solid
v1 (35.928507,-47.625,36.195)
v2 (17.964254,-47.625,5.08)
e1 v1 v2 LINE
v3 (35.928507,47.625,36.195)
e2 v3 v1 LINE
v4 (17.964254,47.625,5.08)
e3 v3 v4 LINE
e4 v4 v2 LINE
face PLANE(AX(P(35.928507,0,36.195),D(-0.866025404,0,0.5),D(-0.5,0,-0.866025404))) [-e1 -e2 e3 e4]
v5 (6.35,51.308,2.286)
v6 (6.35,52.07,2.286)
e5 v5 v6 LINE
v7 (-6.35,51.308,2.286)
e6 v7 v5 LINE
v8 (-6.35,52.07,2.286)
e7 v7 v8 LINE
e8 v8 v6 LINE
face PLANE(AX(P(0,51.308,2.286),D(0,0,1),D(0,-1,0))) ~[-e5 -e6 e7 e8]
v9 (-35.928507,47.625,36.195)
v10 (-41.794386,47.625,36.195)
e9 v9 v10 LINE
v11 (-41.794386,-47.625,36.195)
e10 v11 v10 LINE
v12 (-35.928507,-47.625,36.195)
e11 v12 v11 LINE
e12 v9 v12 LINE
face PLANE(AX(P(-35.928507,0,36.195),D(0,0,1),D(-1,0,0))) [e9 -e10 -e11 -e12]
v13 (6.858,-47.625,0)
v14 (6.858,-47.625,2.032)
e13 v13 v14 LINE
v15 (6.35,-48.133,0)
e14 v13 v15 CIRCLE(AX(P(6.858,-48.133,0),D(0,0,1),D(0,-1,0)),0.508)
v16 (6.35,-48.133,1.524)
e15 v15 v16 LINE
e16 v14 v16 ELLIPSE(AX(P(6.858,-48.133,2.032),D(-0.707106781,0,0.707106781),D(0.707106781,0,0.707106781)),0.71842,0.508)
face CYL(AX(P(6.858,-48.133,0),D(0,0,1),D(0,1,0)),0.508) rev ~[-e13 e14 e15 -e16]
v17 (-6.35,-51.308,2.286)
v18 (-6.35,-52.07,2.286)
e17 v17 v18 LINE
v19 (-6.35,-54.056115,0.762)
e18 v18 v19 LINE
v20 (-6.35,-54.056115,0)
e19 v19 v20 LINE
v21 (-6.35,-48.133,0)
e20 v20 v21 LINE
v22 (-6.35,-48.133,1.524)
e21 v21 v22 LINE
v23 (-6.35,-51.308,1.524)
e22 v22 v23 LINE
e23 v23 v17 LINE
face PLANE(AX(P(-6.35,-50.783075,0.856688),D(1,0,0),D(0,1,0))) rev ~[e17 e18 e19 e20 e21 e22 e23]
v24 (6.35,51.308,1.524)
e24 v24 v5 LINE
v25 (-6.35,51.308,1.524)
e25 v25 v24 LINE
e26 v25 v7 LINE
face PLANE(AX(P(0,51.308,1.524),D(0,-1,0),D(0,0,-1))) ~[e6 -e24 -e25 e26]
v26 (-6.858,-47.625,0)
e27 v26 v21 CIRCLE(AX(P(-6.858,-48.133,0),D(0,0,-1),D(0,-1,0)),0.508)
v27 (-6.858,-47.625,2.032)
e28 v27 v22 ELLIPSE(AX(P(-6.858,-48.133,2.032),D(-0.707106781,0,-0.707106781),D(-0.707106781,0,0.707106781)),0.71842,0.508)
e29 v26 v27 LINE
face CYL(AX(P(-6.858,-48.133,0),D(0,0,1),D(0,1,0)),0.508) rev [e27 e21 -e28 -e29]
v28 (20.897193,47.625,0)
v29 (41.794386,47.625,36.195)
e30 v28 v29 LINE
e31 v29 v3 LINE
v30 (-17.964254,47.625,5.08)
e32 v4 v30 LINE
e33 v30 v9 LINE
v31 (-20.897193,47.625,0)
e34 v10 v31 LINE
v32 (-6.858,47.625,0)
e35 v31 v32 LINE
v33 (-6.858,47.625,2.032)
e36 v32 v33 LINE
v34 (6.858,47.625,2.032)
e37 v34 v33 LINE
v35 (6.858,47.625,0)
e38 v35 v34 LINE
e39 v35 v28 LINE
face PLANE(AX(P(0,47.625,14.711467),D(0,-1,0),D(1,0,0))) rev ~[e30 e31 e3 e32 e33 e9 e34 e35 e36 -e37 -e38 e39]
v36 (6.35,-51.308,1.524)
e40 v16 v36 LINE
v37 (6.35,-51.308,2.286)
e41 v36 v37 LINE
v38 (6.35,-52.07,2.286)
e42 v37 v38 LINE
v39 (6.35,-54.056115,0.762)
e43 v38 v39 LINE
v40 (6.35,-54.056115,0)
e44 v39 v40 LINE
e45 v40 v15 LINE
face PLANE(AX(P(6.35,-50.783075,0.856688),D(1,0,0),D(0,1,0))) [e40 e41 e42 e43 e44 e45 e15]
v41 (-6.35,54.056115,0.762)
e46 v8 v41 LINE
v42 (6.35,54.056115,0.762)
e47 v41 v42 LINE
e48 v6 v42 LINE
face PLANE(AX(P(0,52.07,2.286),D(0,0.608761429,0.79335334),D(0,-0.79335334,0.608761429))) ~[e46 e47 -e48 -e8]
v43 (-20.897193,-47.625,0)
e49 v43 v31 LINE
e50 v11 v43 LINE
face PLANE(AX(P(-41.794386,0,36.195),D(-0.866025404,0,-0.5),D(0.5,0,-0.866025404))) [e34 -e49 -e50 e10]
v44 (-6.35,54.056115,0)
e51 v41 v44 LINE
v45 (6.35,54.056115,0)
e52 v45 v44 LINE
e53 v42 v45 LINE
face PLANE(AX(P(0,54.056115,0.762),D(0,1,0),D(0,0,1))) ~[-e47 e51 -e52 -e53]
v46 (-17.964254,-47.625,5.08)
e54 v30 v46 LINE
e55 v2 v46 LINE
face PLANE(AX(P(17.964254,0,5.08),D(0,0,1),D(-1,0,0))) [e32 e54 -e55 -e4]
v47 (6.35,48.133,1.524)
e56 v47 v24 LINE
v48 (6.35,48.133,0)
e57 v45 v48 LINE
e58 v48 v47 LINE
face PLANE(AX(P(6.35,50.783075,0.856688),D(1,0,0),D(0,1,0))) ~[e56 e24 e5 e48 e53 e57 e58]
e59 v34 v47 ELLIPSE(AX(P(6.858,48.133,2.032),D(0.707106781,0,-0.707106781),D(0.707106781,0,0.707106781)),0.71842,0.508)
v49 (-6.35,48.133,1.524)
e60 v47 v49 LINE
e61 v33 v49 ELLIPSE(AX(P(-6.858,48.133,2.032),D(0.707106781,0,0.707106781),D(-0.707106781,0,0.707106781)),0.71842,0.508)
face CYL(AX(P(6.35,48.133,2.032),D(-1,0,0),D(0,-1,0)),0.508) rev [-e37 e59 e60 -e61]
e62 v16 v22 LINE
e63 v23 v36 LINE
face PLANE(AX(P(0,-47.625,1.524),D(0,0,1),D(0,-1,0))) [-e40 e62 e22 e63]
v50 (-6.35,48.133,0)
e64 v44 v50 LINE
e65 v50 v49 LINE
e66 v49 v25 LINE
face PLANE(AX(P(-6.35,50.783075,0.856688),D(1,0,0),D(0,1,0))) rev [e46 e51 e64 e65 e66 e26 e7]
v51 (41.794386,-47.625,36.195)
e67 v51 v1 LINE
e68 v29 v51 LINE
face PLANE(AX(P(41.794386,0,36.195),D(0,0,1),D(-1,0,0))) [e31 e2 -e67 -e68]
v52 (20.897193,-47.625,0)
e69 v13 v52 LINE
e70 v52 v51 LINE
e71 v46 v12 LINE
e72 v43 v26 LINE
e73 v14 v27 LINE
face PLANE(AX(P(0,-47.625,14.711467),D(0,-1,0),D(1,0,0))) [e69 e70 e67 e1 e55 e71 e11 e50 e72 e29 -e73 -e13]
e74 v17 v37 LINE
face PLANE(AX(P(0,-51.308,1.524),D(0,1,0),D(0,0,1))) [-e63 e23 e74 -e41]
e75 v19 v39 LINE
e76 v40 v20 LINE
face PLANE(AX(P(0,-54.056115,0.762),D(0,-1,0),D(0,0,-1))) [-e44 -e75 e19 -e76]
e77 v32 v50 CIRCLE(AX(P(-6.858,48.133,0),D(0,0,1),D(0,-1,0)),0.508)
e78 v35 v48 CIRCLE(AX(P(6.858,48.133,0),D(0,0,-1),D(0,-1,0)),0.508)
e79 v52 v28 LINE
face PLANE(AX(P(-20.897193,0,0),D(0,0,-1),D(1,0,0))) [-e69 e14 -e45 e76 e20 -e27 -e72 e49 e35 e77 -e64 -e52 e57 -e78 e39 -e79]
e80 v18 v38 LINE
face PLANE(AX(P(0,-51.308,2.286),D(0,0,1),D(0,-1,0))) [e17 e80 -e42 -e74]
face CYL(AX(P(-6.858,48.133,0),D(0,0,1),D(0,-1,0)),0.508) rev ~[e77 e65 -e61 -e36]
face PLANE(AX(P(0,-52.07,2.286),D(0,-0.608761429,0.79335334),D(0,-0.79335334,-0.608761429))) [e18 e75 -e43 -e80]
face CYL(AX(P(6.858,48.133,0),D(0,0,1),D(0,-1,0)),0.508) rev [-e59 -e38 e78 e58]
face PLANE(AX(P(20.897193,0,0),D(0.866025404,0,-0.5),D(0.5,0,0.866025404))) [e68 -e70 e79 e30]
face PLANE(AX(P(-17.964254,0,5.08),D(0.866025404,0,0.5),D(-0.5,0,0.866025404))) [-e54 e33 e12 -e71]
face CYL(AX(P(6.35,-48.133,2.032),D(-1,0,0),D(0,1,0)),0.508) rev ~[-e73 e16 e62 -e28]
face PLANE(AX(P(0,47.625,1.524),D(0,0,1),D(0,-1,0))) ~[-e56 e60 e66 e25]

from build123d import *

# Parameters (mm, degrees)
F1_DEPTH = 47.625
F3_DEPTH = 6.35
F4_R     = 0.508


# Not quite as in the source:
# - a pattern or mirror of a feature is missing from the dataset's text; its kind, count and spacing are read off the source's solid


with BuildPart() as f1:
    # F0 (on Front) → F1 (new body, symmetric)
    with BuildSketch(Plane.XZ):
        Polygon((20.8971929933, 0), (41.7943859866, 36.195), (35.9285072517, 36.195), (17.9642536258, 5.08), (-17.9642536258, 5.08), (-35.9285072517, 36.195), (-41.7943859866, 36.195), (-20.8971929933, 0), align=None)
    extrude(amount=F1_DEPTH, both=True)

    # F2 (on Right) → F3 (join, symmetric)
    with BuildSketch(Plane.YZ):
        Polygon((-47.625, 1.524), (-51.308, 1.524), (-51.308, 2.286), (-52.07, 2.286), (-54.0561154682, 0.762), (-54.0561154682, 0), (-47.625, 0), align=None)
    f3 = extrude(amount=F3_DEPTH, both=True)

    # F3_copies: F3 across plane
    add(f3.mirror(Plane.ZX))

    # F4
    f4_edges = [f1.edges().sort_by_distance(p)[0] for p in [
        (-6.35, -47.625, 0.762),
        (6.35, -47.625, 0.762),
        (0, -47.625, 1.524),
        (6.35, 47.625, 0.762),
        (0, 47.625, 1.524),
        (-6.35, 47.625, 0.762),
    ]]
    fillet(f4_edges, radius=F4_R)


solid = f1.part
